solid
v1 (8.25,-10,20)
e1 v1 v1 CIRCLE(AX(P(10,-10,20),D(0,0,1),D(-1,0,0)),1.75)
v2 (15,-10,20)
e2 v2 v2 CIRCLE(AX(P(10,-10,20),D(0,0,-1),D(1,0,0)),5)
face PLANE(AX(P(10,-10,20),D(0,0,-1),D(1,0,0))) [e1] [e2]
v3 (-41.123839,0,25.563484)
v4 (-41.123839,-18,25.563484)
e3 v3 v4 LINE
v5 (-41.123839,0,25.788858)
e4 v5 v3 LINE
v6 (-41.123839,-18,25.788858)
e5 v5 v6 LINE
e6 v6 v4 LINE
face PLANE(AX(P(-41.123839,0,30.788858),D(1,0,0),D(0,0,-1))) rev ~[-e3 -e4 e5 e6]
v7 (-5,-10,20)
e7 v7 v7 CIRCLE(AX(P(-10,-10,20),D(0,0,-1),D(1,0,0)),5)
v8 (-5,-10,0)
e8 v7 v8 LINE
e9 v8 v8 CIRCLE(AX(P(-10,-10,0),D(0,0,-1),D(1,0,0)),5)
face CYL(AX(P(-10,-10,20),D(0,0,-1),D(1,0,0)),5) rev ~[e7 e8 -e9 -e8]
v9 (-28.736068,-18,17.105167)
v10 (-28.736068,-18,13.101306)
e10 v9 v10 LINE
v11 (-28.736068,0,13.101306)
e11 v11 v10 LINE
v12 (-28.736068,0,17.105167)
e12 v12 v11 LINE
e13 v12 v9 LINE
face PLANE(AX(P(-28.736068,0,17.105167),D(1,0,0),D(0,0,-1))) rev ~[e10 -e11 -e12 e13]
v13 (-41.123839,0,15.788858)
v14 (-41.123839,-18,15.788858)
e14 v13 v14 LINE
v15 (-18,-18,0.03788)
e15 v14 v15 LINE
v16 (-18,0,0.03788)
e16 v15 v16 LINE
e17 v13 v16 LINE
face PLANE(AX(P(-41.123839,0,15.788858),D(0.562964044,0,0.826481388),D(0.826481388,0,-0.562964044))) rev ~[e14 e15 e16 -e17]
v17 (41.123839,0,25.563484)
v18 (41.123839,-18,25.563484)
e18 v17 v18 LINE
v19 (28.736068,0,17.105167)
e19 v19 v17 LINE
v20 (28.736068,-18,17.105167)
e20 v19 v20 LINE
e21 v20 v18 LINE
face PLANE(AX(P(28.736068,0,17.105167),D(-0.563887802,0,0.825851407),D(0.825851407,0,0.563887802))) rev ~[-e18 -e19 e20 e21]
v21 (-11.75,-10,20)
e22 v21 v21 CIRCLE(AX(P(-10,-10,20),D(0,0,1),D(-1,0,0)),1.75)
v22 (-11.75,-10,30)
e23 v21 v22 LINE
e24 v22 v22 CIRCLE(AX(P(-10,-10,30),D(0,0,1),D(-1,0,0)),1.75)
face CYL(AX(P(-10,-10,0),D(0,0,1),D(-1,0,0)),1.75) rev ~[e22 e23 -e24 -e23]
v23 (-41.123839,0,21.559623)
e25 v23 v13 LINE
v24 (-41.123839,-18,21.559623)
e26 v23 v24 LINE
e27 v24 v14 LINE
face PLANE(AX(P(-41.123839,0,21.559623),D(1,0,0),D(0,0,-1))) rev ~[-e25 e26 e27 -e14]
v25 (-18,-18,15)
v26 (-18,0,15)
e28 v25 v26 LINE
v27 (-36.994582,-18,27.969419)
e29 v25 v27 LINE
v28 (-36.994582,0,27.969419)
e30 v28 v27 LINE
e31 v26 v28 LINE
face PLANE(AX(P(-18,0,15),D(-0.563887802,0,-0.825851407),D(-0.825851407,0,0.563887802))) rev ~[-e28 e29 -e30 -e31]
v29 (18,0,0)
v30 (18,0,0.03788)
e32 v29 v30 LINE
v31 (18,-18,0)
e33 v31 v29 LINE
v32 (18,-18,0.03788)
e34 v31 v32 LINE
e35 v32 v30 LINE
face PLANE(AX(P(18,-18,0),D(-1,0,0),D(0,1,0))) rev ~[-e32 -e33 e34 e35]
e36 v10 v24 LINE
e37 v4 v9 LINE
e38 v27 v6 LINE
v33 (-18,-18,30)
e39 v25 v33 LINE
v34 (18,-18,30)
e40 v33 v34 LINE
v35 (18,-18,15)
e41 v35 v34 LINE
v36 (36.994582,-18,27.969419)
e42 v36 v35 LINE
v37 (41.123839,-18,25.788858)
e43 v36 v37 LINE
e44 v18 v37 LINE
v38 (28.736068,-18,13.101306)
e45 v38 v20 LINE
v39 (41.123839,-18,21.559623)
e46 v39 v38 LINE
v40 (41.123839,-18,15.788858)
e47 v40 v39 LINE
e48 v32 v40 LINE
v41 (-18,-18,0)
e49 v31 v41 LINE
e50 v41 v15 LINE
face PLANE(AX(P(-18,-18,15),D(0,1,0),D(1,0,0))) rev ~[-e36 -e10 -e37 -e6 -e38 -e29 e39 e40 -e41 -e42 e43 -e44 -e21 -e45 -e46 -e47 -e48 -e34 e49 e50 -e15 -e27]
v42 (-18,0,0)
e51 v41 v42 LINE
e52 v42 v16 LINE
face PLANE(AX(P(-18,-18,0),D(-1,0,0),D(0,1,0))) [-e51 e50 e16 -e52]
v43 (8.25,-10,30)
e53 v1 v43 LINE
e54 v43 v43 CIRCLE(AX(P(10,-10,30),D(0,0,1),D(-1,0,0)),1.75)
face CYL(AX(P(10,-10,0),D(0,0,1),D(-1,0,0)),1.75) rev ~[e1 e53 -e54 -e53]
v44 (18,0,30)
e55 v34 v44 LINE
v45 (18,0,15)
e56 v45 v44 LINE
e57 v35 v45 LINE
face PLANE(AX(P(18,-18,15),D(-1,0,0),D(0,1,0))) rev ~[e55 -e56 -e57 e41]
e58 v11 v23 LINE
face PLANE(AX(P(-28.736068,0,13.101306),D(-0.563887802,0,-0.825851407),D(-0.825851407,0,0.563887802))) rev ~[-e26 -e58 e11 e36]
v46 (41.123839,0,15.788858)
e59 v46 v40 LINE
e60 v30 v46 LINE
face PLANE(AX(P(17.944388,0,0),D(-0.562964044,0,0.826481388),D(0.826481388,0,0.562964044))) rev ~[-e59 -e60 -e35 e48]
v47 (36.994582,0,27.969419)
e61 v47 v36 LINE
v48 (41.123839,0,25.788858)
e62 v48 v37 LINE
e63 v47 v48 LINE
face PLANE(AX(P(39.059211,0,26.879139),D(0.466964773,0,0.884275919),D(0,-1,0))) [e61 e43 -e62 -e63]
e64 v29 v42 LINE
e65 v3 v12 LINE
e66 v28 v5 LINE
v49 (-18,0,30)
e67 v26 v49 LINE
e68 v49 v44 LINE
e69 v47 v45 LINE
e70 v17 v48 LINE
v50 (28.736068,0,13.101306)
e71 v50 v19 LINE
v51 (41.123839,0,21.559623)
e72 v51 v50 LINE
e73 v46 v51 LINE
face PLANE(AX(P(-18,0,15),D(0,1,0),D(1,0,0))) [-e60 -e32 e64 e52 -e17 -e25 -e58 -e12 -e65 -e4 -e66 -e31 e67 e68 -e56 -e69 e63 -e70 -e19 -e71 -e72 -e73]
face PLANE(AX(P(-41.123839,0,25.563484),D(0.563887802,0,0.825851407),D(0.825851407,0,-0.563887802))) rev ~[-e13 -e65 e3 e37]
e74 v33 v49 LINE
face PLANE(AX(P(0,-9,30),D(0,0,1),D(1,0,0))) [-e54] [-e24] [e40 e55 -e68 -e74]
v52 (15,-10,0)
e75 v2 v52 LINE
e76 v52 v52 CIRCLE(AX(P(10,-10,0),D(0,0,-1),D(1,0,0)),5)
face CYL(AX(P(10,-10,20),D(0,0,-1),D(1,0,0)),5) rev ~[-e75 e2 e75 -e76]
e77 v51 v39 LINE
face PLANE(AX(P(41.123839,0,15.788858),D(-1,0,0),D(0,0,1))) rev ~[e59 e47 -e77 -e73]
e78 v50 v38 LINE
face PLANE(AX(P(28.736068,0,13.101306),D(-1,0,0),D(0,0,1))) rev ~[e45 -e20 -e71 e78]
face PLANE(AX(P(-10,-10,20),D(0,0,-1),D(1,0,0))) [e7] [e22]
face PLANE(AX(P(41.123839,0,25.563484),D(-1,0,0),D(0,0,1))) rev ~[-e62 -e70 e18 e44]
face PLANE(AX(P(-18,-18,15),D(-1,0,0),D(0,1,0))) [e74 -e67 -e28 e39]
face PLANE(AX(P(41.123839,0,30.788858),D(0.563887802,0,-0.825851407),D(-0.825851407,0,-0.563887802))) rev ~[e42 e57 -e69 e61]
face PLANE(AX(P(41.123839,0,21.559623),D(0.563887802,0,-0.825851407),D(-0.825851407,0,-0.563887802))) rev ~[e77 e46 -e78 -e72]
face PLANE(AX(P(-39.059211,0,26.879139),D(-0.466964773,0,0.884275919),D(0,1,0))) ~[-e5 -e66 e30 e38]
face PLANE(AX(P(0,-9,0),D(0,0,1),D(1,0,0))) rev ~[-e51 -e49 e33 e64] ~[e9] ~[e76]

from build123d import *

# Parameters (mm, degrees)
F0_W           = 36
F0_H           = 18
F1_DEPTH       = 15
F3_DEPTH       = 18
F4_DEPTH       = 15
F5_SIZE        = 5
F6_D           = 3.5
F6_CBORE_D     = 10
F6_CBORE_DEPTH = 20


# Not quite as in the source:
# - a feature names something its author has since deleted; it is built from what else it names


with BuildPart() as f1:
    # F0 (on Top) → F1 (new body)
    with BuildSketch(Plane.XY):
        with Locations((0, -9)):
            Rectangle(F0_W, F0_H)
    extrude(amount=F1_DEPTH)

    # F2 (on Front) → F3 (join)
    with BuildSketch(Plane.XZ):
        Polygon((-17.9443880916, 0), (-18, 15), (-41.1238394028, 30.7888584537), (-41.1238394028, 25.5634840578), (-28.7360682942, 17.105167029), (-28.7360682942, 13.1013058126), (-41.1238394028, 21.5596228414), (-41.1238394028, 15.7888584537), align=None)
        Polygon((28.7360682942, 17.105167029), (41.1238394028, 25.5634840578), (41.1238394028, 30.7888584537), (18, 15), (17.9443880916, 0), (41.1238394028, 15.7888584537), (41.1238394028, 21.5596228414), (28.7360682942, 13.1013058126), align=None)
    extrude(amount=F3_DEPTH)

    # F4 (add): a face of the model
    f4_faces = [f1.faces().sort_by_distance(p)[0] for p in [
        (0, -9, 15),
    ]]
    extrude(f4_faces, amount=F4_DEPTH)

    # F5
    f5_edges = [f1.edges().sort_by_distance(p)[0] for p in [
        (41.123839, -9, 30.788858),
        (-41.123839, -9, 30.788858),
    ]]
    chamfer(f5_edges, length=F5_SIZE)

    # F6 (through all)
    with Locations(Plane(origin=(0, 0, 0), x_dir=(1, 0, 0), z_dir=(0, 0, -1))):
        with Locations((-10, 10), (10, 10)):
            CounterBoreHole(F6_D / 2, F6_CBORE_D / 2, F6_CBORE_DEPTH)


solid = f1.part
